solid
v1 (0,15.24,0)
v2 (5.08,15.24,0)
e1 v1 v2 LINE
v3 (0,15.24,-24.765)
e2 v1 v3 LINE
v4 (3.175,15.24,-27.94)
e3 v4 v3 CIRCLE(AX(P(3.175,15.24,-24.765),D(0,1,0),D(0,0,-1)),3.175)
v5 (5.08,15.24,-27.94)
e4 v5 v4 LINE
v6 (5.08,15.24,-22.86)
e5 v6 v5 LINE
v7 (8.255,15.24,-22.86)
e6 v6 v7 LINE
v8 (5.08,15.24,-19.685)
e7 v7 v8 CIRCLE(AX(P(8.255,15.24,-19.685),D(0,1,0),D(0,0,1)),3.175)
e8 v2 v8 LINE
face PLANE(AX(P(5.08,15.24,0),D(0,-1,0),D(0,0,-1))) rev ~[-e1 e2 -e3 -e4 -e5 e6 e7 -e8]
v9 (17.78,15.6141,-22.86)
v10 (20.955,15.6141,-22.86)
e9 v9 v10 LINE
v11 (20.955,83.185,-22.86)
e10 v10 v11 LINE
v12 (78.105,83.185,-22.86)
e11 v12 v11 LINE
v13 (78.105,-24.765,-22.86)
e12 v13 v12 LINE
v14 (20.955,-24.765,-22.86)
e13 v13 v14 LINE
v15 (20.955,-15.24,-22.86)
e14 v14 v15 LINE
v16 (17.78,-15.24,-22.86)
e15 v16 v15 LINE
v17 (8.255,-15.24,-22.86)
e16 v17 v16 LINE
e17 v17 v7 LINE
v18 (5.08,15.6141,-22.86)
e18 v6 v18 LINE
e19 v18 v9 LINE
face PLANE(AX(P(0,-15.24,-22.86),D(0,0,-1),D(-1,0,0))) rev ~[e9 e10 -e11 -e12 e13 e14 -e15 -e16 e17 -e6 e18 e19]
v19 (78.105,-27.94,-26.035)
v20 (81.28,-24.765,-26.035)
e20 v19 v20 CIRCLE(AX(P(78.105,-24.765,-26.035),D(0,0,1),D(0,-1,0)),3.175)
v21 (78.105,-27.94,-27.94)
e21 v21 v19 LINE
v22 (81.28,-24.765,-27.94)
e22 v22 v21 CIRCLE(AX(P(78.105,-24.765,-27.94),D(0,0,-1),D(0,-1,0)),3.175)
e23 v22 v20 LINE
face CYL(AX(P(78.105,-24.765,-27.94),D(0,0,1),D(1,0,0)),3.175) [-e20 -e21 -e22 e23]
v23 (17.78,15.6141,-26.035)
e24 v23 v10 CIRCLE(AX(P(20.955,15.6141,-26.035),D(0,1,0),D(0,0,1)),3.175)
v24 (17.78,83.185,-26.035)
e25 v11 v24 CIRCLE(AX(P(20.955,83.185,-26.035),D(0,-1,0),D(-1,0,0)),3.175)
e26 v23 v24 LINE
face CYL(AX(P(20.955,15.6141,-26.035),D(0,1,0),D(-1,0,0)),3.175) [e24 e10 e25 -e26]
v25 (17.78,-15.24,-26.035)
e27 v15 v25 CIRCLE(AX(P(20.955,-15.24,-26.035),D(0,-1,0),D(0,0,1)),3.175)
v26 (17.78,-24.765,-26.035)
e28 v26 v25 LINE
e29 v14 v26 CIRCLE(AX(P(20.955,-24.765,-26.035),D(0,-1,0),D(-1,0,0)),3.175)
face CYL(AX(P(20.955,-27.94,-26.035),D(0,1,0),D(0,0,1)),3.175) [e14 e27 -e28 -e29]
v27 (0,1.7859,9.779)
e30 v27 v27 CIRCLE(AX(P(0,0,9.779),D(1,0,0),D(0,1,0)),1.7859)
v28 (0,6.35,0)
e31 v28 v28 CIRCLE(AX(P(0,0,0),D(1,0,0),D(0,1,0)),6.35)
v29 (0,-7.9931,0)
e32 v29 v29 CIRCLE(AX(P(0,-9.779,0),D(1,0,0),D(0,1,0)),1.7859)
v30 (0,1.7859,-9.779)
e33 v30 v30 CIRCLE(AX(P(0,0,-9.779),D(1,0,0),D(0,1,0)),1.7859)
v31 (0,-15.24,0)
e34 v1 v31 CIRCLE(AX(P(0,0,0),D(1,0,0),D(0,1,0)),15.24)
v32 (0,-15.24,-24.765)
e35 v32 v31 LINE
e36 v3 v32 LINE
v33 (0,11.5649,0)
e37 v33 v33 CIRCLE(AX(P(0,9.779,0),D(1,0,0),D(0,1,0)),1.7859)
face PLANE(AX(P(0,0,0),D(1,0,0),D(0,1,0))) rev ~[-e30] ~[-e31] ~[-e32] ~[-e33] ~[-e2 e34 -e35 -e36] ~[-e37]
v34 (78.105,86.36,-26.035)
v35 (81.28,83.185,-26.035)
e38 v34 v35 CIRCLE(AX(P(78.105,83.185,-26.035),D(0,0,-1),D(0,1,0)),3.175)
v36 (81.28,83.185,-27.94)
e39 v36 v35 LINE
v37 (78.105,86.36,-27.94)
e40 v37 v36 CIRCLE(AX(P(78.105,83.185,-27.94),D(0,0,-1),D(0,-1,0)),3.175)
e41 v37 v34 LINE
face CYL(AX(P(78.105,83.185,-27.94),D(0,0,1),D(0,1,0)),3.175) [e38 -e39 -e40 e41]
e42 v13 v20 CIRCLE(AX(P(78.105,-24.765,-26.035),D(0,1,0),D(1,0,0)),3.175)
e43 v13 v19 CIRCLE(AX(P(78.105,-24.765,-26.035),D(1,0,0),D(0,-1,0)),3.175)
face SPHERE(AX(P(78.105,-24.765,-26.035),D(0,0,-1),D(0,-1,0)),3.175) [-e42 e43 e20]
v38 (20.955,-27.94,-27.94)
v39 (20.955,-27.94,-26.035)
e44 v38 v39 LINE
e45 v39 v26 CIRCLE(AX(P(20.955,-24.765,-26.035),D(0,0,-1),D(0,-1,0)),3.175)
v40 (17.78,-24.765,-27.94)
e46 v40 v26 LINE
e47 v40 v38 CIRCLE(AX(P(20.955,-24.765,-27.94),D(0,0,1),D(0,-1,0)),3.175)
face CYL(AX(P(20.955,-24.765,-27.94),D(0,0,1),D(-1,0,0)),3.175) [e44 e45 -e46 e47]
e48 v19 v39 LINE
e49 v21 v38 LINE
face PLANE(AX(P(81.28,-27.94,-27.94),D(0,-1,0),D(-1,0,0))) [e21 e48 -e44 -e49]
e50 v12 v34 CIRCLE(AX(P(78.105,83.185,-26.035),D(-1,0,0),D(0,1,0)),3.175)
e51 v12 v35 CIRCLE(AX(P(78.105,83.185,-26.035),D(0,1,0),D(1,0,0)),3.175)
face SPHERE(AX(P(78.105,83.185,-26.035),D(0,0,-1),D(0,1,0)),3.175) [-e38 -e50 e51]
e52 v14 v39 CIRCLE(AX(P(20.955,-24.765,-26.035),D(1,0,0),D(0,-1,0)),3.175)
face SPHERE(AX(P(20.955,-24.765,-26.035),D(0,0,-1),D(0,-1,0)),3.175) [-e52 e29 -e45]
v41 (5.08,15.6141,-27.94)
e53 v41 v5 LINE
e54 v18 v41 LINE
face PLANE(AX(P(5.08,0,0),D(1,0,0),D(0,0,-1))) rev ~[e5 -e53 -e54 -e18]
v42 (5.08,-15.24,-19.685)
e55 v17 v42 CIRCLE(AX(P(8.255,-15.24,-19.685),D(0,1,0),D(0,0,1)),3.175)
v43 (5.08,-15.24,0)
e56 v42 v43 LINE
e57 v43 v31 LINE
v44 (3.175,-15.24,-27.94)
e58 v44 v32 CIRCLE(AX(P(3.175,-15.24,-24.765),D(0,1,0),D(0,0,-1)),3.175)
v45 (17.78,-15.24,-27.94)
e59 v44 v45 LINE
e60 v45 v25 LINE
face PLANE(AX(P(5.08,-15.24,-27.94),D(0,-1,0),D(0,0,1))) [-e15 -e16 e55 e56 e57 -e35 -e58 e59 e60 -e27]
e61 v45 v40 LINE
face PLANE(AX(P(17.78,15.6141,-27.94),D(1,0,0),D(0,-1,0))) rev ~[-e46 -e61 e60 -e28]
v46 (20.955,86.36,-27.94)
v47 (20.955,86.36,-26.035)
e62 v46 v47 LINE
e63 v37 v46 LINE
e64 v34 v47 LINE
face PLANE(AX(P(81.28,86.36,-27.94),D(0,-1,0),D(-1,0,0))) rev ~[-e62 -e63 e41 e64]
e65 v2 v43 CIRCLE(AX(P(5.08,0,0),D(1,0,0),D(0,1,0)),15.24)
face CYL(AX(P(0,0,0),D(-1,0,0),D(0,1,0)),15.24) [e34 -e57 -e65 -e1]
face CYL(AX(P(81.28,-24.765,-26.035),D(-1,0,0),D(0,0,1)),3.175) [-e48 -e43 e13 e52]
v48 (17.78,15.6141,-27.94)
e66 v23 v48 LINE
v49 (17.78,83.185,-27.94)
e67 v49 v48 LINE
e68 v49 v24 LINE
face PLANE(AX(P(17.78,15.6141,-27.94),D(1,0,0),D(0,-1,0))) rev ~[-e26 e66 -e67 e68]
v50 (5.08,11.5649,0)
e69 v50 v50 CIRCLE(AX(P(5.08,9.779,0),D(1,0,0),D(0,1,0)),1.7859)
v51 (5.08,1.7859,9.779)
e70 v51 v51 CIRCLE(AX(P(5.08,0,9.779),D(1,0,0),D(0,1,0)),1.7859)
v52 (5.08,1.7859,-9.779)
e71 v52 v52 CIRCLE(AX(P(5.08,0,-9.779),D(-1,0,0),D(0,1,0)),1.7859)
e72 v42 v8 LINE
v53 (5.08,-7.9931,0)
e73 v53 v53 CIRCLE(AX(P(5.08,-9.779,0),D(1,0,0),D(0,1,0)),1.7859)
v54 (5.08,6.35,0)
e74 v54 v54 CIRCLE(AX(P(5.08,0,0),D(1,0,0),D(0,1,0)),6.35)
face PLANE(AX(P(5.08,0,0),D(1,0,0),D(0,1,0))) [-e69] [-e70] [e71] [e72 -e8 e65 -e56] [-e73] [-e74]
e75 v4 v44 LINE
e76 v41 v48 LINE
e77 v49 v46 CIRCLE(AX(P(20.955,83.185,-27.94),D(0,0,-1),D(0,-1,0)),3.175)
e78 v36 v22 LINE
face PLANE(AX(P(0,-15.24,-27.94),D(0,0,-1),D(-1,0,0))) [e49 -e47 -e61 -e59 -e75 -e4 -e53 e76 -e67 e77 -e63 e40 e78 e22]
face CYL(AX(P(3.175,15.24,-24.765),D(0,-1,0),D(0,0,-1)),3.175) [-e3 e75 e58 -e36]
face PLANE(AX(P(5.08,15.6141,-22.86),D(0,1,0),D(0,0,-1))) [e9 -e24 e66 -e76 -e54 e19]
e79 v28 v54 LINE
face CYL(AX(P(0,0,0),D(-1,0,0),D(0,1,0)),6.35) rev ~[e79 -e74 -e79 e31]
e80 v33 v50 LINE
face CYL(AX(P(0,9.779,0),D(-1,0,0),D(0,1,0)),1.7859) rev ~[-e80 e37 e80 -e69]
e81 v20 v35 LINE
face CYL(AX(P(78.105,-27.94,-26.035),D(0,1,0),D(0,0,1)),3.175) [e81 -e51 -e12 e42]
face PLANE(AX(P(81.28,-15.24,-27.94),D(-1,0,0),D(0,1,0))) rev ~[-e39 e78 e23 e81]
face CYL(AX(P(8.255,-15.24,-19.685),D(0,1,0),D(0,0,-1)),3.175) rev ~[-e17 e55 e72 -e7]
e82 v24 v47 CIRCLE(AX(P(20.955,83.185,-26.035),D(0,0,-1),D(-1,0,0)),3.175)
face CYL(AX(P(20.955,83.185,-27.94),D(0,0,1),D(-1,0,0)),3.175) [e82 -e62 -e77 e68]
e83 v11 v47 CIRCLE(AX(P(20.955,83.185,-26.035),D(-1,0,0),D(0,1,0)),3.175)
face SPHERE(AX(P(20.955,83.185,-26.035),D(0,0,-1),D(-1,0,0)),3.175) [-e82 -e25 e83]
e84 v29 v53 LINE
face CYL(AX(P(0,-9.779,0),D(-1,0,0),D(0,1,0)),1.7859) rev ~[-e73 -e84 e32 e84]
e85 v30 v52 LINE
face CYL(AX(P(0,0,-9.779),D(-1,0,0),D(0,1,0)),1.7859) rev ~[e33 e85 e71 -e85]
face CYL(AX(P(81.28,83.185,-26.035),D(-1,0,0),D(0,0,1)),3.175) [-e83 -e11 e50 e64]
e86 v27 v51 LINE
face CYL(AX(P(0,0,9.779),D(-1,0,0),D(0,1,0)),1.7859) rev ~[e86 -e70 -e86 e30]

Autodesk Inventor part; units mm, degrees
ref_plane "YZ Plane" through (0, 0, 0) normal (1, 0, 0) x (0, 1, 0)
ref_plane "XZ Plane" through (0, 0, 0) normal (0, 1, 0) x (-1, 0, 0)
ref_plane "XY Plane" through (0, 0, 0) normal (0, 0, 1) x (1, 0, 0)
sketch "Sketch1" plane through (0, 0, 0) normal (1, 0, 0) x (0, 1, 0)
  circle A0 centre (0, 0) radius 15.24
  circle A1 centre (9.779, 0) radius 1.7859
  circle A2 centre (0, -9.779) radius 1.7859
  circle A3 centre (-9.779, 0) radius 1.7859
  circle A4 centre (0, 9.779) radius 1.7859
  circle A5 centre (0, 0) radius 6.35
  arc A6 (-1.7785, -9.6159) -> (1.7785, -9.6159) centre (0, 0) ccw
  dimension "d0" = 30.48
  dimension "d2" = 3.5719
  dimension "d3" = 3.5719
  dimension "d4" = 3.5719
  dimension "d5" = 3.5719
  dimension "d6" = 12.7
extrude "Extrusion1" add sketch "Sketch1" along normal blind 5.08
sketch "Sketch5" plane through (5.08, 0, 0) normal (1, 0, 0) x (0, 0, -1)
  circle A0 centre (0, 0) radius 15.24 projected
  arc A1 (0, -15.24) -> (0, 15.24) centre (0, 0) ccw
  line L0 (0, 15.24) -> (27.94, 15.24)
  line L1 (27.94, 15.24) -> (27.94, -15.24)
  line L2 (27.94, -15.24) -> (0, -15.24)
  dimension "d17" = 27.94
  dimension "d18" = 30.48
extrude "Extrusion3" add sketch "Sketch5" against normal blind 5.08 contours A0 L0 L1 L2
sketch "Sketch6" plane through (5.08, 0, 0) normal (1, 0, 0) x (0, 0, -1)
  line L0 (27.94, -15.24) -> (27.94, 15.24) projected
  line L1 (27.94, -15.24) -> (22.86, -15.24)
  line L2 (22.86, -15.24) -> (22.86, 15.6141)
  line L3 (22.86, 15.6141) -> (27.94, 15.6141)
  line L4 (27.94, 15.6141) -> (27.94, -15.24)
  point P0 (0, 0)
  dimension "d21" = 5.08
extrude "Extrusion4" add sketch "Sketch6" along normal blind 12.7
sketch "Sketch7" plane through (0, -15.24, -27.94) normal (0, 0, -1) x (-1, 0, 0)
  line L0 (-17.78, 30.8541) -> (-17.78, 0) projected
  line L1 (-17.78, 0) -> (-81.28, 0)
  line L2 (-81.28, 0) -> (-81.28, 101.6)
  line L3 (-81.28, 101.6) -> (-17.78, 101.6)
  line L4 (-17.78, 101.6) -> (-17.78, 0)
  line L5 (-5.08, 0) -> (-17.78, 0) projected
  line L6 (-17.78, 0) -> (-81.28, 0)
  line L7 (-81.28, 0) -> (-81.28, -12.7)
  line L8 (-81.28, -12.7) -> (-17.78, -12.7)
  line L9 (-17.78, -12.7) -> (-17.78, 0)
  point P0 (0, 15.24)
  dimension "d24" = 63.5
  dimension "d25" = 101.6
  dimension "d26" = 12.7
extrude "Extrusion5" add sketch "Sketch7" against normal blind 5.08
fillet "Fillet1" radius 3.175 11 edges at (5.08, 0, -22.86) (17.78, 86.36, -25.4) (81.28, 86.36, -25.4) (81.28, -27.94, -25.4) (0, 0, -27.94) (17.78, -27.94, -25.4) (49.53, -27.94, -22.86) (17.78, -21.59, -22.86) (17.78, 50.987, -22.86) (49.53, 86.36, -22.86) (81.28, 29.21, -22.86)
properties part number "GripperConstant"
